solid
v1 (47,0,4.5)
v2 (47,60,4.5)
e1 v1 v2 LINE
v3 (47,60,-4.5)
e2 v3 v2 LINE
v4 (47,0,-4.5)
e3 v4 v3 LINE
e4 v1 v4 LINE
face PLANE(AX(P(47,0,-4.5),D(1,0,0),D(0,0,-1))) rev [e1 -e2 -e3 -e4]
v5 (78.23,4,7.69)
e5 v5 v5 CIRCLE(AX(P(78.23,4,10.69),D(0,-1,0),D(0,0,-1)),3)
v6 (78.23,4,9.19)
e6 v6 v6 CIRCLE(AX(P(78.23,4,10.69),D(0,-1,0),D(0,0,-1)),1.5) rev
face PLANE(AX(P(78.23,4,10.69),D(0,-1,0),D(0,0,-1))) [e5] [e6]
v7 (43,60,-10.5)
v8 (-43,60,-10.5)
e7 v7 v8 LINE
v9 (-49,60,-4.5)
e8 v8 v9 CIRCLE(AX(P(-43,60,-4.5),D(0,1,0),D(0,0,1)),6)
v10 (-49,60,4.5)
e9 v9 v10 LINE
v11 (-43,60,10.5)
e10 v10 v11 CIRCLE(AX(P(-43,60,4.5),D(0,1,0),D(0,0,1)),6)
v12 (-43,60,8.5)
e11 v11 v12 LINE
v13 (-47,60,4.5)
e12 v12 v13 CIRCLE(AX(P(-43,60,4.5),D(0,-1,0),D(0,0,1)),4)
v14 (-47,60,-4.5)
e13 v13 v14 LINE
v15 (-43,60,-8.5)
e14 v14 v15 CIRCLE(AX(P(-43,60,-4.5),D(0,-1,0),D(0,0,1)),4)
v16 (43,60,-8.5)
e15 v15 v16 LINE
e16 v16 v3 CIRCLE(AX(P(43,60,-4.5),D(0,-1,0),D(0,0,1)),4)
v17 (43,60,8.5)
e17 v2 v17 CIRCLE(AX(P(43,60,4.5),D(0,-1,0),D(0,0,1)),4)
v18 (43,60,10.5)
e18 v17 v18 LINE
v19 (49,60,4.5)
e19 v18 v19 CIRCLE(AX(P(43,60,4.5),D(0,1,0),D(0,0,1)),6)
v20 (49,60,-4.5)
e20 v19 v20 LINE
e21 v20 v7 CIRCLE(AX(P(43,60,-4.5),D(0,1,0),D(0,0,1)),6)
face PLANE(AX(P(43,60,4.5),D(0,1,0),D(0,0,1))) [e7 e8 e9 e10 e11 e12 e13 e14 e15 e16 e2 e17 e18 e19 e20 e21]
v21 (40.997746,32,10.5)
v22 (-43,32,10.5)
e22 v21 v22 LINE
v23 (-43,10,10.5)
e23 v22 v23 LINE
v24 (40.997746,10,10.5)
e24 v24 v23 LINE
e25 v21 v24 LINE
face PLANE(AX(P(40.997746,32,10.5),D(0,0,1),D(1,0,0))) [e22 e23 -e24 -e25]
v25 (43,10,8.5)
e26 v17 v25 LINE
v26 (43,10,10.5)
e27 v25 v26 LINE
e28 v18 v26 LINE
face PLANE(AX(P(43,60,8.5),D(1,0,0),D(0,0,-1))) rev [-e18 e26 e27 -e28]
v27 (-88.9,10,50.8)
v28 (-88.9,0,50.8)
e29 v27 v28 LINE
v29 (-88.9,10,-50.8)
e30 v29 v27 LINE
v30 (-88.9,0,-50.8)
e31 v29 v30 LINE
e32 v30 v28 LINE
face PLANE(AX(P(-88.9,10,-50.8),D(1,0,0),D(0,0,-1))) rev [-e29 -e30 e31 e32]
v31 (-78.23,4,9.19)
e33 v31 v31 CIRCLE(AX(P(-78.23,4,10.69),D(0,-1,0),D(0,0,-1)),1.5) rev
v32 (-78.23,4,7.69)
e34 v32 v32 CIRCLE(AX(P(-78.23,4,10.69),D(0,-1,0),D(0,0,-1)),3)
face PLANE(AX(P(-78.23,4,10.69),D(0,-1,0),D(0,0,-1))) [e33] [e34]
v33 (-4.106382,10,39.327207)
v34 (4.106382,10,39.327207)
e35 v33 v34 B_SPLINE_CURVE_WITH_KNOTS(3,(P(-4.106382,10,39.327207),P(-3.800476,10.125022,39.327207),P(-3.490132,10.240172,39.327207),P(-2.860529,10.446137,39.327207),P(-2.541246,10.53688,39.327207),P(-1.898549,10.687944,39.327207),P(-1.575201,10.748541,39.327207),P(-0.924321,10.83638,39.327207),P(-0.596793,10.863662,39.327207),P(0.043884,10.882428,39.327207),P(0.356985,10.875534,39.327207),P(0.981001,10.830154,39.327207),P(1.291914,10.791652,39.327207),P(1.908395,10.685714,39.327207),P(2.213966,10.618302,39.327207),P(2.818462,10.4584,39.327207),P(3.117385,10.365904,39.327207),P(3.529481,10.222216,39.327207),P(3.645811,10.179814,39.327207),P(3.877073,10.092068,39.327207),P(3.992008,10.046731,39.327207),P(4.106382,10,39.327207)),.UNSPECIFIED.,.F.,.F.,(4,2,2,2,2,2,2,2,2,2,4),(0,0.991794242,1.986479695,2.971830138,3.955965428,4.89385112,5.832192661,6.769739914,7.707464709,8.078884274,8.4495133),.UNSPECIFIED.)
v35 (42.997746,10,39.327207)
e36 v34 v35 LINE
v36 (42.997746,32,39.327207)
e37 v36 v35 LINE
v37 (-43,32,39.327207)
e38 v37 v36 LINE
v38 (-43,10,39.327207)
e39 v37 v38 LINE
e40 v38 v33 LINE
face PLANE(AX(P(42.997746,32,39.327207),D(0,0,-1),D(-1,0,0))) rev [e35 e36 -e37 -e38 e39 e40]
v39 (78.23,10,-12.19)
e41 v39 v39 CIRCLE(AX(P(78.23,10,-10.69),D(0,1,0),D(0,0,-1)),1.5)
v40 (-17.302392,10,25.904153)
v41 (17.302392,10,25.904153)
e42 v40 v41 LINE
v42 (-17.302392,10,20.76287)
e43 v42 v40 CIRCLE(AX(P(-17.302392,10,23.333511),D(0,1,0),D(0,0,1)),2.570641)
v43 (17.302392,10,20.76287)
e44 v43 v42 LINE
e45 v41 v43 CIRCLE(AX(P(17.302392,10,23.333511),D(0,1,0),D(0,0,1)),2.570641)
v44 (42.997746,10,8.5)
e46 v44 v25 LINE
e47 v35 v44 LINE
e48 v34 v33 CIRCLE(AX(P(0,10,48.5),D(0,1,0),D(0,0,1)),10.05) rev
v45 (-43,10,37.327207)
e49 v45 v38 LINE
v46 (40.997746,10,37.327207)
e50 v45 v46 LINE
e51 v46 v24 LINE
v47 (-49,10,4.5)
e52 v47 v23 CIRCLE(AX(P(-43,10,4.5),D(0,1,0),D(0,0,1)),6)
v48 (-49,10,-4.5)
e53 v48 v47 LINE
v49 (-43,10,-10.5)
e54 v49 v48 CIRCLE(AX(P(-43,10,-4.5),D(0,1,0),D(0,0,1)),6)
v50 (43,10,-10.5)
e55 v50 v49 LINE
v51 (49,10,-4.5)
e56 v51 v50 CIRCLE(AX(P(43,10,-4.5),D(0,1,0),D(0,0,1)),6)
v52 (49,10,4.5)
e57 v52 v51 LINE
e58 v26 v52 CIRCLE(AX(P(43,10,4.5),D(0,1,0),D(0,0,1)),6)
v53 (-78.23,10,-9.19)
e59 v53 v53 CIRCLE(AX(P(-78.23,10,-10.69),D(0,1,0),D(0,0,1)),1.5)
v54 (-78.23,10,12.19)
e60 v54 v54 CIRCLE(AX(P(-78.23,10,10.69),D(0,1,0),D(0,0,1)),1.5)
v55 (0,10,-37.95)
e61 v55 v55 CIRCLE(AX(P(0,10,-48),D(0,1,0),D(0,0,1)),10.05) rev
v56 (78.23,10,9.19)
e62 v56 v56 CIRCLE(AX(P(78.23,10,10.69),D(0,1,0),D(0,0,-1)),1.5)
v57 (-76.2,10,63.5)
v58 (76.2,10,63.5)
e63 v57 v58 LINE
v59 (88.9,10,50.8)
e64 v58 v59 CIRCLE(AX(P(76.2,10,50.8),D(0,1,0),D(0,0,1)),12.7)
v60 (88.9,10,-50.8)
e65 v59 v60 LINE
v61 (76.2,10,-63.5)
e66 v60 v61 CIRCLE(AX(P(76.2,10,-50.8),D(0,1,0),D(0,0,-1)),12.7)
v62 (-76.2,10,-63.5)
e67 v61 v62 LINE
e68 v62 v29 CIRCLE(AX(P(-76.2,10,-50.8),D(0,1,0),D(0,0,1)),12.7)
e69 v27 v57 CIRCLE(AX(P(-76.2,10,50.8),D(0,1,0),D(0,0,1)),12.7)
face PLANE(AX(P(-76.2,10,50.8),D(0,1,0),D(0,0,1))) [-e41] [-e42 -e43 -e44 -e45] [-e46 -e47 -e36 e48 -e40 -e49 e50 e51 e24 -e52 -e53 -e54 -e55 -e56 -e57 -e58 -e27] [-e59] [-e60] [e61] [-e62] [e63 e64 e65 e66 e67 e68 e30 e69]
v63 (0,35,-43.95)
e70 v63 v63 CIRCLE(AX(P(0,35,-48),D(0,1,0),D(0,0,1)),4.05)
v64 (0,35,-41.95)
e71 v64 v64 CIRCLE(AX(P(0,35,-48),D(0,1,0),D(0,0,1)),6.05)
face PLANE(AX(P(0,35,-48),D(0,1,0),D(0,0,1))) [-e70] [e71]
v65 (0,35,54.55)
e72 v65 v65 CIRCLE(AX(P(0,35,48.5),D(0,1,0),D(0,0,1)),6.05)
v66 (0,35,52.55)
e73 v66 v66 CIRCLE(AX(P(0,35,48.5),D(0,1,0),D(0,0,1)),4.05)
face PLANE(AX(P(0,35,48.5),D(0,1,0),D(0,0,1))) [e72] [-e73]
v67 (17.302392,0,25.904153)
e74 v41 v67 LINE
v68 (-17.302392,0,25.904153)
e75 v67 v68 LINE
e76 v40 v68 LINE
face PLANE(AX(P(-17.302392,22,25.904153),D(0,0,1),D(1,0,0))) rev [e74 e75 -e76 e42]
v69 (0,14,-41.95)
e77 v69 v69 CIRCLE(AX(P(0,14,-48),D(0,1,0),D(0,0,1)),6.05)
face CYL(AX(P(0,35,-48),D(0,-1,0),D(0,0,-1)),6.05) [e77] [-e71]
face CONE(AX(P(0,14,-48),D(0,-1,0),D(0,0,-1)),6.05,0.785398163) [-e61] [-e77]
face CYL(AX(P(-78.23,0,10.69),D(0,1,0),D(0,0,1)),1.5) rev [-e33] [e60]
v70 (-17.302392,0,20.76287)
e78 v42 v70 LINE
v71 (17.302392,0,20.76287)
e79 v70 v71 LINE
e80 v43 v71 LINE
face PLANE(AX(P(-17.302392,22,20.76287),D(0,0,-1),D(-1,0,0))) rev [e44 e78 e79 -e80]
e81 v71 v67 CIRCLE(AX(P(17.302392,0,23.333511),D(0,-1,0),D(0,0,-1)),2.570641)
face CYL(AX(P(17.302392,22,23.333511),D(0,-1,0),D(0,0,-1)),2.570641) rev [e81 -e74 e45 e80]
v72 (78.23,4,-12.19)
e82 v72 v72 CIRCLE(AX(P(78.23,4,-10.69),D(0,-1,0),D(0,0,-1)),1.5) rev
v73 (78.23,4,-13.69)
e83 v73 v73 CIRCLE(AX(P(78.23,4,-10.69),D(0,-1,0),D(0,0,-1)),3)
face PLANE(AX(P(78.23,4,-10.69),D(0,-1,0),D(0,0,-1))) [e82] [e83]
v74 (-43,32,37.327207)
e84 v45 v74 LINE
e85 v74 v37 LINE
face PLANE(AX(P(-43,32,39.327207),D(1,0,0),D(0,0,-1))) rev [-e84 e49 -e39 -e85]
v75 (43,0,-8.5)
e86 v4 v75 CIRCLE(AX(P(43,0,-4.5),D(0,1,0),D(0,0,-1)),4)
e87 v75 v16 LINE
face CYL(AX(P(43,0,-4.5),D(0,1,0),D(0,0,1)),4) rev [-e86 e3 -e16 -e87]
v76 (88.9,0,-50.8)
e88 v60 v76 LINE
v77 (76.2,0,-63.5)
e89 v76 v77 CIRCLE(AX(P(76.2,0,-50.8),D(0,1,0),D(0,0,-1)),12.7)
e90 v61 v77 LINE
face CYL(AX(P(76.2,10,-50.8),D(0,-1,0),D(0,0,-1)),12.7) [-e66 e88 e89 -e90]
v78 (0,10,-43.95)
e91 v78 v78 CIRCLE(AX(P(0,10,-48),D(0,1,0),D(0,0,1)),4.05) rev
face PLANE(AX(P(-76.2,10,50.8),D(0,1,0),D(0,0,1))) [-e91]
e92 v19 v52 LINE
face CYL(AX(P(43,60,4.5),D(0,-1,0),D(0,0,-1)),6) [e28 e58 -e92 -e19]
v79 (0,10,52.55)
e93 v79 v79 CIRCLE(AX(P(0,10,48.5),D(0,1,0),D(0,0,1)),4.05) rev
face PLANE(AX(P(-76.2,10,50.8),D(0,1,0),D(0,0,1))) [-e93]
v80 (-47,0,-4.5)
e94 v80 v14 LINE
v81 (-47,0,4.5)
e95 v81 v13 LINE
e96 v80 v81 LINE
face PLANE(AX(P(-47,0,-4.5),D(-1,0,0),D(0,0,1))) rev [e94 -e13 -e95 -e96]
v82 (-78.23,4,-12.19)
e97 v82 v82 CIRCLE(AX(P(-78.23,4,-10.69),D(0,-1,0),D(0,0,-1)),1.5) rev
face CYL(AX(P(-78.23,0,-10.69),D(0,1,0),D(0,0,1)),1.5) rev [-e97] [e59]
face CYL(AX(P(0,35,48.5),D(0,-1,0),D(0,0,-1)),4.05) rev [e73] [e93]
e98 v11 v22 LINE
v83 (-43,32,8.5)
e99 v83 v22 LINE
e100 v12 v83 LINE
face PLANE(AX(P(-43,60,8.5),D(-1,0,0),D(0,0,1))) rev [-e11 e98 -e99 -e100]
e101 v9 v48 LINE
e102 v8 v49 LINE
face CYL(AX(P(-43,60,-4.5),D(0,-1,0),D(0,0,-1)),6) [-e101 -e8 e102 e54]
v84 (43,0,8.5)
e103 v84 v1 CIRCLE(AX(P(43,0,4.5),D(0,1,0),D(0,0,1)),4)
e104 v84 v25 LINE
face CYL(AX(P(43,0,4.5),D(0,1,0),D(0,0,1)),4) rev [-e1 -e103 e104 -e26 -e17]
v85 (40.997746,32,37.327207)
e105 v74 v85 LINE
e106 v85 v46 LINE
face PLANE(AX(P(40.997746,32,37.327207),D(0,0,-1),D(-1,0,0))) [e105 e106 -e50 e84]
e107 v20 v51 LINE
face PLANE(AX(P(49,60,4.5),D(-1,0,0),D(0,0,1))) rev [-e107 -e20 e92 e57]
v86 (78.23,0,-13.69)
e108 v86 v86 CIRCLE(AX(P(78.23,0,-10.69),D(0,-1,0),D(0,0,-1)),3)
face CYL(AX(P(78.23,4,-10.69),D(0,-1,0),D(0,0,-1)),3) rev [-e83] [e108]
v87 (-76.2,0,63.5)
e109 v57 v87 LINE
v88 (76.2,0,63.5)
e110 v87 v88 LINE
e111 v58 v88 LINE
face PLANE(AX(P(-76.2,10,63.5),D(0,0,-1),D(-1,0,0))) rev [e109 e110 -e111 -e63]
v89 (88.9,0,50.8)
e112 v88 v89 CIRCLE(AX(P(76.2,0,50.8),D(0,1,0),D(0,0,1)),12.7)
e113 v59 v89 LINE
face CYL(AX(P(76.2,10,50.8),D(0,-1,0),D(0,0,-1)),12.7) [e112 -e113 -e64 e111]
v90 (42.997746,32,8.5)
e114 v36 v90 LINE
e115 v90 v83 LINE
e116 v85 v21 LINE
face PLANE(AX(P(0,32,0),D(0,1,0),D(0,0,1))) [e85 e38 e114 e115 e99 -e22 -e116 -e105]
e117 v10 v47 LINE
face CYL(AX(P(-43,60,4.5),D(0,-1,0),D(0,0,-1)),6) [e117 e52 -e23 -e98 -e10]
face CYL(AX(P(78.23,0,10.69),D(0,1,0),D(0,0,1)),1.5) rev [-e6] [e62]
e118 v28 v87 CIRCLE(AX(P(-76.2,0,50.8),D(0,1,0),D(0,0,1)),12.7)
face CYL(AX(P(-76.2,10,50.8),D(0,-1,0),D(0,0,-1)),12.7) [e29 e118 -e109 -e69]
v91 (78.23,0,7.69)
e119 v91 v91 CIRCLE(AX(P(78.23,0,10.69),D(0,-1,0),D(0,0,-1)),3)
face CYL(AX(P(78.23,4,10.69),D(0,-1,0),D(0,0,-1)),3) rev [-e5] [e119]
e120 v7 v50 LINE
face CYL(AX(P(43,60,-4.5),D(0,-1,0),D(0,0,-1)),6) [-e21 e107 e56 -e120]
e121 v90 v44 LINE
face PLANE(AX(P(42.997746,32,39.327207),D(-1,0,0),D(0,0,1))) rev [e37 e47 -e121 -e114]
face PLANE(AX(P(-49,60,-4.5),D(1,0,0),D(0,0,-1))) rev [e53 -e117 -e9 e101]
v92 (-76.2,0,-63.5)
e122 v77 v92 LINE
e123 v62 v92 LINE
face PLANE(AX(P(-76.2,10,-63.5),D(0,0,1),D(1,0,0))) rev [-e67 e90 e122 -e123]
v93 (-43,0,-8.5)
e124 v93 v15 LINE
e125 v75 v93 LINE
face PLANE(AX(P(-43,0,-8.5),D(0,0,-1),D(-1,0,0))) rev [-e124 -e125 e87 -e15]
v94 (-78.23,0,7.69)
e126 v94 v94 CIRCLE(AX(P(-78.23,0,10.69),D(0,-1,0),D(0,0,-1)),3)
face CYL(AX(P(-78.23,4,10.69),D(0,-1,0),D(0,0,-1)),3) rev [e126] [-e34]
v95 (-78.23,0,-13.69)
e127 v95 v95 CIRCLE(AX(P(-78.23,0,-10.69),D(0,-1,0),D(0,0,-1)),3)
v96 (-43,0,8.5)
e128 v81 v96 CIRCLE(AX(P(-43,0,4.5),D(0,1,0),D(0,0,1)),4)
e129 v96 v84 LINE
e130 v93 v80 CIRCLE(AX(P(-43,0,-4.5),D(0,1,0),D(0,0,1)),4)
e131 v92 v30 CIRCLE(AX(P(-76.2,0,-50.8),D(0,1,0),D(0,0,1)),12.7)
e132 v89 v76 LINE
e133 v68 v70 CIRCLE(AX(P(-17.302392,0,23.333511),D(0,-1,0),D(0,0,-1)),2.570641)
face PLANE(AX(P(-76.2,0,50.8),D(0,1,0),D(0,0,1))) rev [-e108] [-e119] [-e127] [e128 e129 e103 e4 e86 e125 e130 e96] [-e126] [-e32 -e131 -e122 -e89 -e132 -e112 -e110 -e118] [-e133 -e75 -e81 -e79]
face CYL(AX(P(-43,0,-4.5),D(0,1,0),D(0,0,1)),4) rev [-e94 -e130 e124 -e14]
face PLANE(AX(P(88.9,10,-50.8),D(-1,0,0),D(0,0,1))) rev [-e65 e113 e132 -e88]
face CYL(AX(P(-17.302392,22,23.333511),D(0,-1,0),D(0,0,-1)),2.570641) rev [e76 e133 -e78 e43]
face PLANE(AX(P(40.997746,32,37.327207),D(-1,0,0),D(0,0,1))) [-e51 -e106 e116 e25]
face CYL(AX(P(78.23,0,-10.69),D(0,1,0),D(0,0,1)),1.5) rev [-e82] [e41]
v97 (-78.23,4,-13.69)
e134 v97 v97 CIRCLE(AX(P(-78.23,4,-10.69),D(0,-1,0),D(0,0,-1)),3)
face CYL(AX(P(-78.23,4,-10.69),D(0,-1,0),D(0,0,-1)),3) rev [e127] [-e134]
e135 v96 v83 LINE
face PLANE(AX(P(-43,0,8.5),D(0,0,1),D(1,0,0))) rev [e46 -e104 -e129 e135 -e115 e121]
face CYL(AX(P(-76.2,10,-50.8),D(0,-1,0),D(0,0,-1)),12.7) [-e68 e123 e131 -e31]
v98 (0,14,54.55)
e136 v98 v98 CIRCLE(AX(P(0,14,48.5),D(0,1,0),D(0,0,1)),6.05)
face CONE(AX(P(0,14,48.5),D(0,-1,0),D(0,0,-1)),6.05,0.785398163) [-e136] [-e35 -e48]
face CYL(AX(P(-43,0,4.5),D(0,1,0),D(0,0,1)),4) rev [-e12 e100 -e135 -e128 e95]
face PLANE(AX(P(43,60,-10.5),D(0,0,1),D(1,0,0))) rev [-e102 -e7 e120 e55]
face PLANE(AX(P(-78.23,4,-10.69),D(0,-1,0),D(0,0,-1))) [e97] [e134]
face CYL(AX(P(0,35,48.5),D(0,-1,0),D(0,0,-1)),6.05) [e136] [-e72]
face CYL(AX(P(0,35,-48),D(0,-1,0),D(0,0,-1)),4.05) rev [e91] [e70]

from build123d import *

# Parameters (mm, degrees)
BOSS_EXTRUDE1_DEPTH = 10
SKETCH3_R           = 6.05
SKETCH3_R_2         = 4.05
BOSS_EXTRUDE2_DEPTH = 25
SKETCH4_R           = 1.5
CUT_EXTRUDE1_DEPTH  = 113.073458053
SKETCH5_R           = 3
CUT_EXTRUDE2_DEPTH  = 4
CUT_EXTRUDE3_DEPTH  = 113.073458053
SKETCH7_W           = 85.997746486
SKETCH7_H           = 30.827207152
SKETCH7_W_2         = 81.997746486
SKETCH7_H_2         = 26.827207152
BOSS_EXTRUDE3_DEPTH = 22
SKETCH9_W           = 26.827207152
SKETCH9_H           = 22
CUT_EXTRUDE7_DEPTH  = 22
BOSS_EXTRUDE4_START = 50
BOSS_EXTRUDE4_DEPTH = 50
CUT_EXTRUDE8_DEPTH  = 22
CHAMFER2_SIZE       = 4


with BuildPart() as part:
    # Sketch2 → Boss-Extrude1 (new body)
    with BuildSketch(Plane(origin=(0, 0, 0), x_dir=(1, 0, 0), z_dir=(0, 1, 0))):
        with BuildLine():
            Line((-76.2, 63.5), (76.2, 63.5))
            ThreePointArc((76.2, 63.5), (85.180256121, 59.780256121), (88.9, 50.8))
            Line((88.9, 50.8), (88.9, -50.8))
            ThreePointArc((88.9, -50.8), (85.180256121, -59.780256121), (76.2, -63.5))
            Line((76.2, -63.5), (-76.2, -63.5))
            ThreePointArc((-76.2, -63.5), (-85.180256121, -59.780256121), (-88.9, -50.8))
            Line((-88.9, -50.8), (-88.9, 50.8))
            ThreePointArc((-88.9, 50.8), (-85.180256121, 59.780256121), (-76.2, 63.5))
        make_face()
    extrude(amount=BOSS_EXTRUDE1_DEPTH)

    # Sketch3 → Boss-Extrude2 (add)
    # profile 1 of 2: a face of its own
    with BuildSketch(Plane(origin=(0, 10, 0), x_dir=(1, 0, 0), z_dir=(0, 1, 0))):
        with Locations(Location((0, 48, 0), (0, 0, 270))):
            Circle(SKETCH3_R)
        with Locations(Location((0, 48, 0), (0, 0, 270))):
            Circle(SKETCH3_R_2, mode=Mode.SUBTRACT)
    # profile 2 of 2: a face of its own
    with BuildSketch(Plane(origin=(0, 10, 0), x_dir=(1, 0, 0), z_dir=(0, 1, 0))):
        with Locations(Location((0, -48.5, 0), (0, 0, 270))):
            Circle(SKETCH3_R)
        with Locations(Location((0, -48.5, 0), (0, 0, 270))):
            Circle(SKETCH3_R_2, mode=Mode.SUBTRACT)
    extrude(amount=BOSS_EXTRUDE2_DEPTH)

    # Sketch4 → Cut-Extrude1 (cut, through all)
    with BuildSketch(Plane(origin=(0, 10, 0), x_dir=(1, 0, 0), z_dir=(0, 1, 0))):
        with Locations(Location((-78.23, 10.69, 0), (0, 0, 270))):
            Circle(SKETCH4_R)
        with Locations(Location((-78.23, -10.69, 0), (0, 0, 270))):
            Circle(SKETCH4_R)
        with Locations(Location((78.23, -10.69, 0), (0, 0, 90))):
            Circle(SKETCH4_R)
        with Locations(Location((78.23, 10.69, 0), (0, 0, 90))):
            Circle(SKETCH4_R)
    extrude(amount=-CUT_EXTRUDE1_DEPTH, mode=Mode.SUBTRACT)

    # Sketch5 → Cut-Extrude2 (cut)
    with BuildSketch(Plane.XZ):
        with Locations(Location((-78.23, 10.69, 0), (0, 0, 270))):
            Circle(SKETCH5_R)
        with Locations(Location((-78.23, -10.69, 0), (0, 0, 270))):
            Circle(SKETCH5_R)
        with Locations(Location((78.23, 10.69, 0), (0, 0, 270))):
            Circle(SKETCH5_R)
        with Locations(Location((78.23, -10.69, 0), (0, 0, 270))):
            Circle(SKETCH5_R)
    extrude(amount=-CUT_EXTRUDE2_DEPTH, mode=Mode.SUBTRACT)

    # Sketch6 → Cut-Extrude3 (cut, through all)
    with BuildSketch(Plane(origin=(0, 10, 0), x_dir=(1, 0, 0), z_dir=(0, 1, 0))):
        with BuildLine():
            Line((-43, 8.5), (43, 8.5))
            ThreePointArc((43, 8.5), (45.828427125, 7.328427125), (47, 4.5))
            Line((47, 4.5), (47, -4.5))
            ThreePointArc((47, -4.5), (45.828427125, -7.328427125), (43, -8.5))
            Line((43, -8.5), (-43, -8.5))
            ThreePointArc((-43, -8.5), (-45.828427125, -7.328427125), (-47, -4.5))
            Line((-47, -4.5), (-47, 4.5))
            ThreePointArc((-47, 4.5), (-45.828427125, 7.328427125), (-43, 8.5))
        make_face()
    extrude(amount=-CUT_EXTRUDE3_DEPTH, mode=Mode.SUBTRACT)

    # Sketch7 → Boss-Extrude3 (add)
    with BuildSketch(Plane(origin=(0, 10, 0), x_dir=(1, 0, 0), z_dir=(0, 1, 0))):
        with Locations((-0.001126757, -23.913603576)):
            Rectangle(SKETCH7_W, SKETCH7_H)
        with Locations((-0.001126757, -23.913603576)):
            Rectangle(SKETCH7_W_2, SKETCH7_H_2, mode=Mode.SUBTRACT)
    extrude(amount=BOSS_EXTRUDE3_DEPTH)

    # Sketch9 → Cut-Extrude7 (cut)
    with BuildSketch(Plane.ZY.offset(43)):
        with Locations((23.913603576, 21)):
            Rectangle(SKETCH9_W, SKETCH9_H)
    extrude(amount=-CUT_EXTRUDE7_DEPTH, mode=Mode.SUBTRACT)

    # Sketch10 → Boss-Extrude4 (add)
    with BuildSketch(Plane(origin=(0, 10, 0), x_dir=(1, 0, 0), z_dir=(0, 1, 0)).offset(BOSS_EXTRUDE4_START)):
        with BuildLine():
            Line((-49, 4.5), (-49, -4.5))
            ThreePointArc((-49, -4.5), (-47.242640687, -8.742640687), (-43, -10.5))
            Line((-43, -10.5), (-43, -8.5))
            ThreePointArc((-43, -8.5), (-45.828427125, -7.328427125), (-47, -4.5))
            Line((-47, -4.5), (-47, 4.5))
            ThreePointArc((-47, 4.5), (-45.828427125, 7.328427125), (-43, 8.5))
            Line((-43, 8.5), (43, 8.5))
            ThreePointArc((43, 8.5), (45.828427125, 7.328427125), (47, 4.5))
            Line((47, 4.5), (47, -4.5))
            ThreePointArc((47, -4.5), (45.828427125, -7.328427125), (43, -8.5))
            Line((43, -8.5), (43, -10.5))
            ThreePointArc((43, -10.5), (47.242640687, -8.742640687), (49, -4.5))
            Line((49, -4.5), (49, 4.5))
            ThreePointArc((49, 4.5), (47.242640687, 8.742640687), (43, 10.5))
            Line((43, 10.5), (-43, 10.5))
            ThreePointArc((-43, 10.5), (-47.242640687, 8.742640687), (-49, 4.5))
        make_face()
    extrude(amount=-BOSS_EXTRUDE4_DEPTH)

    # Sketch11 → Cut-Extrude8 (cut)
    with BuildSketch(Plane.XZ):
        with BuildLine():
            Line((-17.302391978, 25.904152562), (17.302391978, 25.904152562))
            ThreePointArc((17.302391978, 25.904152562), (19.873033072, 23.333511468), (17.302391978, 20.762870374))
            Line((17.302391978, 20.762870374), (-17.302391978, 20.762870374))
            ThreePointArc((-17.302391978, 20.762870374), (-19.873033072, 23.333511468), (-17.302391978, 25.904152562))
        make_face()
    extrude(amount=-CUT_EXTRUDE8_DEPTH, mode=Mode.SUBTRACT)

    # Chamfer2
    # the kernel refuses this chamfer: 4 mm, written as the material it adds along each edge
    with BuildSketch(Plane(origin=(0, 10, -48), x_dir=(0, 0, 1), z_dir=(-1, 0, 0))) as chamfer2_piece_1:
        Polygon((6.05 + CHAMFER2_SIZE, 0), (6.05, CHAMFER2_SIZE), (6.05, 0), align=None)
    revolve(axis=Axis((0, 10, -48), (0, 1, 0)))
    with BuildSketch(Plane(origin=(0, 10, 48.5), x_dir=(0, 0, 1), z_dir=(-1, 0, 0))) as chamfer2_piece_2:
        Polygon((6.05 + CHAMFER2_SIZE, 0), (6.05, CHAMFER2_SIZE), (6.05, 0), align=None)
    revolve(axis=Axis((0, 10, 48.5), (0, 1, 0)))


solid = part.part
